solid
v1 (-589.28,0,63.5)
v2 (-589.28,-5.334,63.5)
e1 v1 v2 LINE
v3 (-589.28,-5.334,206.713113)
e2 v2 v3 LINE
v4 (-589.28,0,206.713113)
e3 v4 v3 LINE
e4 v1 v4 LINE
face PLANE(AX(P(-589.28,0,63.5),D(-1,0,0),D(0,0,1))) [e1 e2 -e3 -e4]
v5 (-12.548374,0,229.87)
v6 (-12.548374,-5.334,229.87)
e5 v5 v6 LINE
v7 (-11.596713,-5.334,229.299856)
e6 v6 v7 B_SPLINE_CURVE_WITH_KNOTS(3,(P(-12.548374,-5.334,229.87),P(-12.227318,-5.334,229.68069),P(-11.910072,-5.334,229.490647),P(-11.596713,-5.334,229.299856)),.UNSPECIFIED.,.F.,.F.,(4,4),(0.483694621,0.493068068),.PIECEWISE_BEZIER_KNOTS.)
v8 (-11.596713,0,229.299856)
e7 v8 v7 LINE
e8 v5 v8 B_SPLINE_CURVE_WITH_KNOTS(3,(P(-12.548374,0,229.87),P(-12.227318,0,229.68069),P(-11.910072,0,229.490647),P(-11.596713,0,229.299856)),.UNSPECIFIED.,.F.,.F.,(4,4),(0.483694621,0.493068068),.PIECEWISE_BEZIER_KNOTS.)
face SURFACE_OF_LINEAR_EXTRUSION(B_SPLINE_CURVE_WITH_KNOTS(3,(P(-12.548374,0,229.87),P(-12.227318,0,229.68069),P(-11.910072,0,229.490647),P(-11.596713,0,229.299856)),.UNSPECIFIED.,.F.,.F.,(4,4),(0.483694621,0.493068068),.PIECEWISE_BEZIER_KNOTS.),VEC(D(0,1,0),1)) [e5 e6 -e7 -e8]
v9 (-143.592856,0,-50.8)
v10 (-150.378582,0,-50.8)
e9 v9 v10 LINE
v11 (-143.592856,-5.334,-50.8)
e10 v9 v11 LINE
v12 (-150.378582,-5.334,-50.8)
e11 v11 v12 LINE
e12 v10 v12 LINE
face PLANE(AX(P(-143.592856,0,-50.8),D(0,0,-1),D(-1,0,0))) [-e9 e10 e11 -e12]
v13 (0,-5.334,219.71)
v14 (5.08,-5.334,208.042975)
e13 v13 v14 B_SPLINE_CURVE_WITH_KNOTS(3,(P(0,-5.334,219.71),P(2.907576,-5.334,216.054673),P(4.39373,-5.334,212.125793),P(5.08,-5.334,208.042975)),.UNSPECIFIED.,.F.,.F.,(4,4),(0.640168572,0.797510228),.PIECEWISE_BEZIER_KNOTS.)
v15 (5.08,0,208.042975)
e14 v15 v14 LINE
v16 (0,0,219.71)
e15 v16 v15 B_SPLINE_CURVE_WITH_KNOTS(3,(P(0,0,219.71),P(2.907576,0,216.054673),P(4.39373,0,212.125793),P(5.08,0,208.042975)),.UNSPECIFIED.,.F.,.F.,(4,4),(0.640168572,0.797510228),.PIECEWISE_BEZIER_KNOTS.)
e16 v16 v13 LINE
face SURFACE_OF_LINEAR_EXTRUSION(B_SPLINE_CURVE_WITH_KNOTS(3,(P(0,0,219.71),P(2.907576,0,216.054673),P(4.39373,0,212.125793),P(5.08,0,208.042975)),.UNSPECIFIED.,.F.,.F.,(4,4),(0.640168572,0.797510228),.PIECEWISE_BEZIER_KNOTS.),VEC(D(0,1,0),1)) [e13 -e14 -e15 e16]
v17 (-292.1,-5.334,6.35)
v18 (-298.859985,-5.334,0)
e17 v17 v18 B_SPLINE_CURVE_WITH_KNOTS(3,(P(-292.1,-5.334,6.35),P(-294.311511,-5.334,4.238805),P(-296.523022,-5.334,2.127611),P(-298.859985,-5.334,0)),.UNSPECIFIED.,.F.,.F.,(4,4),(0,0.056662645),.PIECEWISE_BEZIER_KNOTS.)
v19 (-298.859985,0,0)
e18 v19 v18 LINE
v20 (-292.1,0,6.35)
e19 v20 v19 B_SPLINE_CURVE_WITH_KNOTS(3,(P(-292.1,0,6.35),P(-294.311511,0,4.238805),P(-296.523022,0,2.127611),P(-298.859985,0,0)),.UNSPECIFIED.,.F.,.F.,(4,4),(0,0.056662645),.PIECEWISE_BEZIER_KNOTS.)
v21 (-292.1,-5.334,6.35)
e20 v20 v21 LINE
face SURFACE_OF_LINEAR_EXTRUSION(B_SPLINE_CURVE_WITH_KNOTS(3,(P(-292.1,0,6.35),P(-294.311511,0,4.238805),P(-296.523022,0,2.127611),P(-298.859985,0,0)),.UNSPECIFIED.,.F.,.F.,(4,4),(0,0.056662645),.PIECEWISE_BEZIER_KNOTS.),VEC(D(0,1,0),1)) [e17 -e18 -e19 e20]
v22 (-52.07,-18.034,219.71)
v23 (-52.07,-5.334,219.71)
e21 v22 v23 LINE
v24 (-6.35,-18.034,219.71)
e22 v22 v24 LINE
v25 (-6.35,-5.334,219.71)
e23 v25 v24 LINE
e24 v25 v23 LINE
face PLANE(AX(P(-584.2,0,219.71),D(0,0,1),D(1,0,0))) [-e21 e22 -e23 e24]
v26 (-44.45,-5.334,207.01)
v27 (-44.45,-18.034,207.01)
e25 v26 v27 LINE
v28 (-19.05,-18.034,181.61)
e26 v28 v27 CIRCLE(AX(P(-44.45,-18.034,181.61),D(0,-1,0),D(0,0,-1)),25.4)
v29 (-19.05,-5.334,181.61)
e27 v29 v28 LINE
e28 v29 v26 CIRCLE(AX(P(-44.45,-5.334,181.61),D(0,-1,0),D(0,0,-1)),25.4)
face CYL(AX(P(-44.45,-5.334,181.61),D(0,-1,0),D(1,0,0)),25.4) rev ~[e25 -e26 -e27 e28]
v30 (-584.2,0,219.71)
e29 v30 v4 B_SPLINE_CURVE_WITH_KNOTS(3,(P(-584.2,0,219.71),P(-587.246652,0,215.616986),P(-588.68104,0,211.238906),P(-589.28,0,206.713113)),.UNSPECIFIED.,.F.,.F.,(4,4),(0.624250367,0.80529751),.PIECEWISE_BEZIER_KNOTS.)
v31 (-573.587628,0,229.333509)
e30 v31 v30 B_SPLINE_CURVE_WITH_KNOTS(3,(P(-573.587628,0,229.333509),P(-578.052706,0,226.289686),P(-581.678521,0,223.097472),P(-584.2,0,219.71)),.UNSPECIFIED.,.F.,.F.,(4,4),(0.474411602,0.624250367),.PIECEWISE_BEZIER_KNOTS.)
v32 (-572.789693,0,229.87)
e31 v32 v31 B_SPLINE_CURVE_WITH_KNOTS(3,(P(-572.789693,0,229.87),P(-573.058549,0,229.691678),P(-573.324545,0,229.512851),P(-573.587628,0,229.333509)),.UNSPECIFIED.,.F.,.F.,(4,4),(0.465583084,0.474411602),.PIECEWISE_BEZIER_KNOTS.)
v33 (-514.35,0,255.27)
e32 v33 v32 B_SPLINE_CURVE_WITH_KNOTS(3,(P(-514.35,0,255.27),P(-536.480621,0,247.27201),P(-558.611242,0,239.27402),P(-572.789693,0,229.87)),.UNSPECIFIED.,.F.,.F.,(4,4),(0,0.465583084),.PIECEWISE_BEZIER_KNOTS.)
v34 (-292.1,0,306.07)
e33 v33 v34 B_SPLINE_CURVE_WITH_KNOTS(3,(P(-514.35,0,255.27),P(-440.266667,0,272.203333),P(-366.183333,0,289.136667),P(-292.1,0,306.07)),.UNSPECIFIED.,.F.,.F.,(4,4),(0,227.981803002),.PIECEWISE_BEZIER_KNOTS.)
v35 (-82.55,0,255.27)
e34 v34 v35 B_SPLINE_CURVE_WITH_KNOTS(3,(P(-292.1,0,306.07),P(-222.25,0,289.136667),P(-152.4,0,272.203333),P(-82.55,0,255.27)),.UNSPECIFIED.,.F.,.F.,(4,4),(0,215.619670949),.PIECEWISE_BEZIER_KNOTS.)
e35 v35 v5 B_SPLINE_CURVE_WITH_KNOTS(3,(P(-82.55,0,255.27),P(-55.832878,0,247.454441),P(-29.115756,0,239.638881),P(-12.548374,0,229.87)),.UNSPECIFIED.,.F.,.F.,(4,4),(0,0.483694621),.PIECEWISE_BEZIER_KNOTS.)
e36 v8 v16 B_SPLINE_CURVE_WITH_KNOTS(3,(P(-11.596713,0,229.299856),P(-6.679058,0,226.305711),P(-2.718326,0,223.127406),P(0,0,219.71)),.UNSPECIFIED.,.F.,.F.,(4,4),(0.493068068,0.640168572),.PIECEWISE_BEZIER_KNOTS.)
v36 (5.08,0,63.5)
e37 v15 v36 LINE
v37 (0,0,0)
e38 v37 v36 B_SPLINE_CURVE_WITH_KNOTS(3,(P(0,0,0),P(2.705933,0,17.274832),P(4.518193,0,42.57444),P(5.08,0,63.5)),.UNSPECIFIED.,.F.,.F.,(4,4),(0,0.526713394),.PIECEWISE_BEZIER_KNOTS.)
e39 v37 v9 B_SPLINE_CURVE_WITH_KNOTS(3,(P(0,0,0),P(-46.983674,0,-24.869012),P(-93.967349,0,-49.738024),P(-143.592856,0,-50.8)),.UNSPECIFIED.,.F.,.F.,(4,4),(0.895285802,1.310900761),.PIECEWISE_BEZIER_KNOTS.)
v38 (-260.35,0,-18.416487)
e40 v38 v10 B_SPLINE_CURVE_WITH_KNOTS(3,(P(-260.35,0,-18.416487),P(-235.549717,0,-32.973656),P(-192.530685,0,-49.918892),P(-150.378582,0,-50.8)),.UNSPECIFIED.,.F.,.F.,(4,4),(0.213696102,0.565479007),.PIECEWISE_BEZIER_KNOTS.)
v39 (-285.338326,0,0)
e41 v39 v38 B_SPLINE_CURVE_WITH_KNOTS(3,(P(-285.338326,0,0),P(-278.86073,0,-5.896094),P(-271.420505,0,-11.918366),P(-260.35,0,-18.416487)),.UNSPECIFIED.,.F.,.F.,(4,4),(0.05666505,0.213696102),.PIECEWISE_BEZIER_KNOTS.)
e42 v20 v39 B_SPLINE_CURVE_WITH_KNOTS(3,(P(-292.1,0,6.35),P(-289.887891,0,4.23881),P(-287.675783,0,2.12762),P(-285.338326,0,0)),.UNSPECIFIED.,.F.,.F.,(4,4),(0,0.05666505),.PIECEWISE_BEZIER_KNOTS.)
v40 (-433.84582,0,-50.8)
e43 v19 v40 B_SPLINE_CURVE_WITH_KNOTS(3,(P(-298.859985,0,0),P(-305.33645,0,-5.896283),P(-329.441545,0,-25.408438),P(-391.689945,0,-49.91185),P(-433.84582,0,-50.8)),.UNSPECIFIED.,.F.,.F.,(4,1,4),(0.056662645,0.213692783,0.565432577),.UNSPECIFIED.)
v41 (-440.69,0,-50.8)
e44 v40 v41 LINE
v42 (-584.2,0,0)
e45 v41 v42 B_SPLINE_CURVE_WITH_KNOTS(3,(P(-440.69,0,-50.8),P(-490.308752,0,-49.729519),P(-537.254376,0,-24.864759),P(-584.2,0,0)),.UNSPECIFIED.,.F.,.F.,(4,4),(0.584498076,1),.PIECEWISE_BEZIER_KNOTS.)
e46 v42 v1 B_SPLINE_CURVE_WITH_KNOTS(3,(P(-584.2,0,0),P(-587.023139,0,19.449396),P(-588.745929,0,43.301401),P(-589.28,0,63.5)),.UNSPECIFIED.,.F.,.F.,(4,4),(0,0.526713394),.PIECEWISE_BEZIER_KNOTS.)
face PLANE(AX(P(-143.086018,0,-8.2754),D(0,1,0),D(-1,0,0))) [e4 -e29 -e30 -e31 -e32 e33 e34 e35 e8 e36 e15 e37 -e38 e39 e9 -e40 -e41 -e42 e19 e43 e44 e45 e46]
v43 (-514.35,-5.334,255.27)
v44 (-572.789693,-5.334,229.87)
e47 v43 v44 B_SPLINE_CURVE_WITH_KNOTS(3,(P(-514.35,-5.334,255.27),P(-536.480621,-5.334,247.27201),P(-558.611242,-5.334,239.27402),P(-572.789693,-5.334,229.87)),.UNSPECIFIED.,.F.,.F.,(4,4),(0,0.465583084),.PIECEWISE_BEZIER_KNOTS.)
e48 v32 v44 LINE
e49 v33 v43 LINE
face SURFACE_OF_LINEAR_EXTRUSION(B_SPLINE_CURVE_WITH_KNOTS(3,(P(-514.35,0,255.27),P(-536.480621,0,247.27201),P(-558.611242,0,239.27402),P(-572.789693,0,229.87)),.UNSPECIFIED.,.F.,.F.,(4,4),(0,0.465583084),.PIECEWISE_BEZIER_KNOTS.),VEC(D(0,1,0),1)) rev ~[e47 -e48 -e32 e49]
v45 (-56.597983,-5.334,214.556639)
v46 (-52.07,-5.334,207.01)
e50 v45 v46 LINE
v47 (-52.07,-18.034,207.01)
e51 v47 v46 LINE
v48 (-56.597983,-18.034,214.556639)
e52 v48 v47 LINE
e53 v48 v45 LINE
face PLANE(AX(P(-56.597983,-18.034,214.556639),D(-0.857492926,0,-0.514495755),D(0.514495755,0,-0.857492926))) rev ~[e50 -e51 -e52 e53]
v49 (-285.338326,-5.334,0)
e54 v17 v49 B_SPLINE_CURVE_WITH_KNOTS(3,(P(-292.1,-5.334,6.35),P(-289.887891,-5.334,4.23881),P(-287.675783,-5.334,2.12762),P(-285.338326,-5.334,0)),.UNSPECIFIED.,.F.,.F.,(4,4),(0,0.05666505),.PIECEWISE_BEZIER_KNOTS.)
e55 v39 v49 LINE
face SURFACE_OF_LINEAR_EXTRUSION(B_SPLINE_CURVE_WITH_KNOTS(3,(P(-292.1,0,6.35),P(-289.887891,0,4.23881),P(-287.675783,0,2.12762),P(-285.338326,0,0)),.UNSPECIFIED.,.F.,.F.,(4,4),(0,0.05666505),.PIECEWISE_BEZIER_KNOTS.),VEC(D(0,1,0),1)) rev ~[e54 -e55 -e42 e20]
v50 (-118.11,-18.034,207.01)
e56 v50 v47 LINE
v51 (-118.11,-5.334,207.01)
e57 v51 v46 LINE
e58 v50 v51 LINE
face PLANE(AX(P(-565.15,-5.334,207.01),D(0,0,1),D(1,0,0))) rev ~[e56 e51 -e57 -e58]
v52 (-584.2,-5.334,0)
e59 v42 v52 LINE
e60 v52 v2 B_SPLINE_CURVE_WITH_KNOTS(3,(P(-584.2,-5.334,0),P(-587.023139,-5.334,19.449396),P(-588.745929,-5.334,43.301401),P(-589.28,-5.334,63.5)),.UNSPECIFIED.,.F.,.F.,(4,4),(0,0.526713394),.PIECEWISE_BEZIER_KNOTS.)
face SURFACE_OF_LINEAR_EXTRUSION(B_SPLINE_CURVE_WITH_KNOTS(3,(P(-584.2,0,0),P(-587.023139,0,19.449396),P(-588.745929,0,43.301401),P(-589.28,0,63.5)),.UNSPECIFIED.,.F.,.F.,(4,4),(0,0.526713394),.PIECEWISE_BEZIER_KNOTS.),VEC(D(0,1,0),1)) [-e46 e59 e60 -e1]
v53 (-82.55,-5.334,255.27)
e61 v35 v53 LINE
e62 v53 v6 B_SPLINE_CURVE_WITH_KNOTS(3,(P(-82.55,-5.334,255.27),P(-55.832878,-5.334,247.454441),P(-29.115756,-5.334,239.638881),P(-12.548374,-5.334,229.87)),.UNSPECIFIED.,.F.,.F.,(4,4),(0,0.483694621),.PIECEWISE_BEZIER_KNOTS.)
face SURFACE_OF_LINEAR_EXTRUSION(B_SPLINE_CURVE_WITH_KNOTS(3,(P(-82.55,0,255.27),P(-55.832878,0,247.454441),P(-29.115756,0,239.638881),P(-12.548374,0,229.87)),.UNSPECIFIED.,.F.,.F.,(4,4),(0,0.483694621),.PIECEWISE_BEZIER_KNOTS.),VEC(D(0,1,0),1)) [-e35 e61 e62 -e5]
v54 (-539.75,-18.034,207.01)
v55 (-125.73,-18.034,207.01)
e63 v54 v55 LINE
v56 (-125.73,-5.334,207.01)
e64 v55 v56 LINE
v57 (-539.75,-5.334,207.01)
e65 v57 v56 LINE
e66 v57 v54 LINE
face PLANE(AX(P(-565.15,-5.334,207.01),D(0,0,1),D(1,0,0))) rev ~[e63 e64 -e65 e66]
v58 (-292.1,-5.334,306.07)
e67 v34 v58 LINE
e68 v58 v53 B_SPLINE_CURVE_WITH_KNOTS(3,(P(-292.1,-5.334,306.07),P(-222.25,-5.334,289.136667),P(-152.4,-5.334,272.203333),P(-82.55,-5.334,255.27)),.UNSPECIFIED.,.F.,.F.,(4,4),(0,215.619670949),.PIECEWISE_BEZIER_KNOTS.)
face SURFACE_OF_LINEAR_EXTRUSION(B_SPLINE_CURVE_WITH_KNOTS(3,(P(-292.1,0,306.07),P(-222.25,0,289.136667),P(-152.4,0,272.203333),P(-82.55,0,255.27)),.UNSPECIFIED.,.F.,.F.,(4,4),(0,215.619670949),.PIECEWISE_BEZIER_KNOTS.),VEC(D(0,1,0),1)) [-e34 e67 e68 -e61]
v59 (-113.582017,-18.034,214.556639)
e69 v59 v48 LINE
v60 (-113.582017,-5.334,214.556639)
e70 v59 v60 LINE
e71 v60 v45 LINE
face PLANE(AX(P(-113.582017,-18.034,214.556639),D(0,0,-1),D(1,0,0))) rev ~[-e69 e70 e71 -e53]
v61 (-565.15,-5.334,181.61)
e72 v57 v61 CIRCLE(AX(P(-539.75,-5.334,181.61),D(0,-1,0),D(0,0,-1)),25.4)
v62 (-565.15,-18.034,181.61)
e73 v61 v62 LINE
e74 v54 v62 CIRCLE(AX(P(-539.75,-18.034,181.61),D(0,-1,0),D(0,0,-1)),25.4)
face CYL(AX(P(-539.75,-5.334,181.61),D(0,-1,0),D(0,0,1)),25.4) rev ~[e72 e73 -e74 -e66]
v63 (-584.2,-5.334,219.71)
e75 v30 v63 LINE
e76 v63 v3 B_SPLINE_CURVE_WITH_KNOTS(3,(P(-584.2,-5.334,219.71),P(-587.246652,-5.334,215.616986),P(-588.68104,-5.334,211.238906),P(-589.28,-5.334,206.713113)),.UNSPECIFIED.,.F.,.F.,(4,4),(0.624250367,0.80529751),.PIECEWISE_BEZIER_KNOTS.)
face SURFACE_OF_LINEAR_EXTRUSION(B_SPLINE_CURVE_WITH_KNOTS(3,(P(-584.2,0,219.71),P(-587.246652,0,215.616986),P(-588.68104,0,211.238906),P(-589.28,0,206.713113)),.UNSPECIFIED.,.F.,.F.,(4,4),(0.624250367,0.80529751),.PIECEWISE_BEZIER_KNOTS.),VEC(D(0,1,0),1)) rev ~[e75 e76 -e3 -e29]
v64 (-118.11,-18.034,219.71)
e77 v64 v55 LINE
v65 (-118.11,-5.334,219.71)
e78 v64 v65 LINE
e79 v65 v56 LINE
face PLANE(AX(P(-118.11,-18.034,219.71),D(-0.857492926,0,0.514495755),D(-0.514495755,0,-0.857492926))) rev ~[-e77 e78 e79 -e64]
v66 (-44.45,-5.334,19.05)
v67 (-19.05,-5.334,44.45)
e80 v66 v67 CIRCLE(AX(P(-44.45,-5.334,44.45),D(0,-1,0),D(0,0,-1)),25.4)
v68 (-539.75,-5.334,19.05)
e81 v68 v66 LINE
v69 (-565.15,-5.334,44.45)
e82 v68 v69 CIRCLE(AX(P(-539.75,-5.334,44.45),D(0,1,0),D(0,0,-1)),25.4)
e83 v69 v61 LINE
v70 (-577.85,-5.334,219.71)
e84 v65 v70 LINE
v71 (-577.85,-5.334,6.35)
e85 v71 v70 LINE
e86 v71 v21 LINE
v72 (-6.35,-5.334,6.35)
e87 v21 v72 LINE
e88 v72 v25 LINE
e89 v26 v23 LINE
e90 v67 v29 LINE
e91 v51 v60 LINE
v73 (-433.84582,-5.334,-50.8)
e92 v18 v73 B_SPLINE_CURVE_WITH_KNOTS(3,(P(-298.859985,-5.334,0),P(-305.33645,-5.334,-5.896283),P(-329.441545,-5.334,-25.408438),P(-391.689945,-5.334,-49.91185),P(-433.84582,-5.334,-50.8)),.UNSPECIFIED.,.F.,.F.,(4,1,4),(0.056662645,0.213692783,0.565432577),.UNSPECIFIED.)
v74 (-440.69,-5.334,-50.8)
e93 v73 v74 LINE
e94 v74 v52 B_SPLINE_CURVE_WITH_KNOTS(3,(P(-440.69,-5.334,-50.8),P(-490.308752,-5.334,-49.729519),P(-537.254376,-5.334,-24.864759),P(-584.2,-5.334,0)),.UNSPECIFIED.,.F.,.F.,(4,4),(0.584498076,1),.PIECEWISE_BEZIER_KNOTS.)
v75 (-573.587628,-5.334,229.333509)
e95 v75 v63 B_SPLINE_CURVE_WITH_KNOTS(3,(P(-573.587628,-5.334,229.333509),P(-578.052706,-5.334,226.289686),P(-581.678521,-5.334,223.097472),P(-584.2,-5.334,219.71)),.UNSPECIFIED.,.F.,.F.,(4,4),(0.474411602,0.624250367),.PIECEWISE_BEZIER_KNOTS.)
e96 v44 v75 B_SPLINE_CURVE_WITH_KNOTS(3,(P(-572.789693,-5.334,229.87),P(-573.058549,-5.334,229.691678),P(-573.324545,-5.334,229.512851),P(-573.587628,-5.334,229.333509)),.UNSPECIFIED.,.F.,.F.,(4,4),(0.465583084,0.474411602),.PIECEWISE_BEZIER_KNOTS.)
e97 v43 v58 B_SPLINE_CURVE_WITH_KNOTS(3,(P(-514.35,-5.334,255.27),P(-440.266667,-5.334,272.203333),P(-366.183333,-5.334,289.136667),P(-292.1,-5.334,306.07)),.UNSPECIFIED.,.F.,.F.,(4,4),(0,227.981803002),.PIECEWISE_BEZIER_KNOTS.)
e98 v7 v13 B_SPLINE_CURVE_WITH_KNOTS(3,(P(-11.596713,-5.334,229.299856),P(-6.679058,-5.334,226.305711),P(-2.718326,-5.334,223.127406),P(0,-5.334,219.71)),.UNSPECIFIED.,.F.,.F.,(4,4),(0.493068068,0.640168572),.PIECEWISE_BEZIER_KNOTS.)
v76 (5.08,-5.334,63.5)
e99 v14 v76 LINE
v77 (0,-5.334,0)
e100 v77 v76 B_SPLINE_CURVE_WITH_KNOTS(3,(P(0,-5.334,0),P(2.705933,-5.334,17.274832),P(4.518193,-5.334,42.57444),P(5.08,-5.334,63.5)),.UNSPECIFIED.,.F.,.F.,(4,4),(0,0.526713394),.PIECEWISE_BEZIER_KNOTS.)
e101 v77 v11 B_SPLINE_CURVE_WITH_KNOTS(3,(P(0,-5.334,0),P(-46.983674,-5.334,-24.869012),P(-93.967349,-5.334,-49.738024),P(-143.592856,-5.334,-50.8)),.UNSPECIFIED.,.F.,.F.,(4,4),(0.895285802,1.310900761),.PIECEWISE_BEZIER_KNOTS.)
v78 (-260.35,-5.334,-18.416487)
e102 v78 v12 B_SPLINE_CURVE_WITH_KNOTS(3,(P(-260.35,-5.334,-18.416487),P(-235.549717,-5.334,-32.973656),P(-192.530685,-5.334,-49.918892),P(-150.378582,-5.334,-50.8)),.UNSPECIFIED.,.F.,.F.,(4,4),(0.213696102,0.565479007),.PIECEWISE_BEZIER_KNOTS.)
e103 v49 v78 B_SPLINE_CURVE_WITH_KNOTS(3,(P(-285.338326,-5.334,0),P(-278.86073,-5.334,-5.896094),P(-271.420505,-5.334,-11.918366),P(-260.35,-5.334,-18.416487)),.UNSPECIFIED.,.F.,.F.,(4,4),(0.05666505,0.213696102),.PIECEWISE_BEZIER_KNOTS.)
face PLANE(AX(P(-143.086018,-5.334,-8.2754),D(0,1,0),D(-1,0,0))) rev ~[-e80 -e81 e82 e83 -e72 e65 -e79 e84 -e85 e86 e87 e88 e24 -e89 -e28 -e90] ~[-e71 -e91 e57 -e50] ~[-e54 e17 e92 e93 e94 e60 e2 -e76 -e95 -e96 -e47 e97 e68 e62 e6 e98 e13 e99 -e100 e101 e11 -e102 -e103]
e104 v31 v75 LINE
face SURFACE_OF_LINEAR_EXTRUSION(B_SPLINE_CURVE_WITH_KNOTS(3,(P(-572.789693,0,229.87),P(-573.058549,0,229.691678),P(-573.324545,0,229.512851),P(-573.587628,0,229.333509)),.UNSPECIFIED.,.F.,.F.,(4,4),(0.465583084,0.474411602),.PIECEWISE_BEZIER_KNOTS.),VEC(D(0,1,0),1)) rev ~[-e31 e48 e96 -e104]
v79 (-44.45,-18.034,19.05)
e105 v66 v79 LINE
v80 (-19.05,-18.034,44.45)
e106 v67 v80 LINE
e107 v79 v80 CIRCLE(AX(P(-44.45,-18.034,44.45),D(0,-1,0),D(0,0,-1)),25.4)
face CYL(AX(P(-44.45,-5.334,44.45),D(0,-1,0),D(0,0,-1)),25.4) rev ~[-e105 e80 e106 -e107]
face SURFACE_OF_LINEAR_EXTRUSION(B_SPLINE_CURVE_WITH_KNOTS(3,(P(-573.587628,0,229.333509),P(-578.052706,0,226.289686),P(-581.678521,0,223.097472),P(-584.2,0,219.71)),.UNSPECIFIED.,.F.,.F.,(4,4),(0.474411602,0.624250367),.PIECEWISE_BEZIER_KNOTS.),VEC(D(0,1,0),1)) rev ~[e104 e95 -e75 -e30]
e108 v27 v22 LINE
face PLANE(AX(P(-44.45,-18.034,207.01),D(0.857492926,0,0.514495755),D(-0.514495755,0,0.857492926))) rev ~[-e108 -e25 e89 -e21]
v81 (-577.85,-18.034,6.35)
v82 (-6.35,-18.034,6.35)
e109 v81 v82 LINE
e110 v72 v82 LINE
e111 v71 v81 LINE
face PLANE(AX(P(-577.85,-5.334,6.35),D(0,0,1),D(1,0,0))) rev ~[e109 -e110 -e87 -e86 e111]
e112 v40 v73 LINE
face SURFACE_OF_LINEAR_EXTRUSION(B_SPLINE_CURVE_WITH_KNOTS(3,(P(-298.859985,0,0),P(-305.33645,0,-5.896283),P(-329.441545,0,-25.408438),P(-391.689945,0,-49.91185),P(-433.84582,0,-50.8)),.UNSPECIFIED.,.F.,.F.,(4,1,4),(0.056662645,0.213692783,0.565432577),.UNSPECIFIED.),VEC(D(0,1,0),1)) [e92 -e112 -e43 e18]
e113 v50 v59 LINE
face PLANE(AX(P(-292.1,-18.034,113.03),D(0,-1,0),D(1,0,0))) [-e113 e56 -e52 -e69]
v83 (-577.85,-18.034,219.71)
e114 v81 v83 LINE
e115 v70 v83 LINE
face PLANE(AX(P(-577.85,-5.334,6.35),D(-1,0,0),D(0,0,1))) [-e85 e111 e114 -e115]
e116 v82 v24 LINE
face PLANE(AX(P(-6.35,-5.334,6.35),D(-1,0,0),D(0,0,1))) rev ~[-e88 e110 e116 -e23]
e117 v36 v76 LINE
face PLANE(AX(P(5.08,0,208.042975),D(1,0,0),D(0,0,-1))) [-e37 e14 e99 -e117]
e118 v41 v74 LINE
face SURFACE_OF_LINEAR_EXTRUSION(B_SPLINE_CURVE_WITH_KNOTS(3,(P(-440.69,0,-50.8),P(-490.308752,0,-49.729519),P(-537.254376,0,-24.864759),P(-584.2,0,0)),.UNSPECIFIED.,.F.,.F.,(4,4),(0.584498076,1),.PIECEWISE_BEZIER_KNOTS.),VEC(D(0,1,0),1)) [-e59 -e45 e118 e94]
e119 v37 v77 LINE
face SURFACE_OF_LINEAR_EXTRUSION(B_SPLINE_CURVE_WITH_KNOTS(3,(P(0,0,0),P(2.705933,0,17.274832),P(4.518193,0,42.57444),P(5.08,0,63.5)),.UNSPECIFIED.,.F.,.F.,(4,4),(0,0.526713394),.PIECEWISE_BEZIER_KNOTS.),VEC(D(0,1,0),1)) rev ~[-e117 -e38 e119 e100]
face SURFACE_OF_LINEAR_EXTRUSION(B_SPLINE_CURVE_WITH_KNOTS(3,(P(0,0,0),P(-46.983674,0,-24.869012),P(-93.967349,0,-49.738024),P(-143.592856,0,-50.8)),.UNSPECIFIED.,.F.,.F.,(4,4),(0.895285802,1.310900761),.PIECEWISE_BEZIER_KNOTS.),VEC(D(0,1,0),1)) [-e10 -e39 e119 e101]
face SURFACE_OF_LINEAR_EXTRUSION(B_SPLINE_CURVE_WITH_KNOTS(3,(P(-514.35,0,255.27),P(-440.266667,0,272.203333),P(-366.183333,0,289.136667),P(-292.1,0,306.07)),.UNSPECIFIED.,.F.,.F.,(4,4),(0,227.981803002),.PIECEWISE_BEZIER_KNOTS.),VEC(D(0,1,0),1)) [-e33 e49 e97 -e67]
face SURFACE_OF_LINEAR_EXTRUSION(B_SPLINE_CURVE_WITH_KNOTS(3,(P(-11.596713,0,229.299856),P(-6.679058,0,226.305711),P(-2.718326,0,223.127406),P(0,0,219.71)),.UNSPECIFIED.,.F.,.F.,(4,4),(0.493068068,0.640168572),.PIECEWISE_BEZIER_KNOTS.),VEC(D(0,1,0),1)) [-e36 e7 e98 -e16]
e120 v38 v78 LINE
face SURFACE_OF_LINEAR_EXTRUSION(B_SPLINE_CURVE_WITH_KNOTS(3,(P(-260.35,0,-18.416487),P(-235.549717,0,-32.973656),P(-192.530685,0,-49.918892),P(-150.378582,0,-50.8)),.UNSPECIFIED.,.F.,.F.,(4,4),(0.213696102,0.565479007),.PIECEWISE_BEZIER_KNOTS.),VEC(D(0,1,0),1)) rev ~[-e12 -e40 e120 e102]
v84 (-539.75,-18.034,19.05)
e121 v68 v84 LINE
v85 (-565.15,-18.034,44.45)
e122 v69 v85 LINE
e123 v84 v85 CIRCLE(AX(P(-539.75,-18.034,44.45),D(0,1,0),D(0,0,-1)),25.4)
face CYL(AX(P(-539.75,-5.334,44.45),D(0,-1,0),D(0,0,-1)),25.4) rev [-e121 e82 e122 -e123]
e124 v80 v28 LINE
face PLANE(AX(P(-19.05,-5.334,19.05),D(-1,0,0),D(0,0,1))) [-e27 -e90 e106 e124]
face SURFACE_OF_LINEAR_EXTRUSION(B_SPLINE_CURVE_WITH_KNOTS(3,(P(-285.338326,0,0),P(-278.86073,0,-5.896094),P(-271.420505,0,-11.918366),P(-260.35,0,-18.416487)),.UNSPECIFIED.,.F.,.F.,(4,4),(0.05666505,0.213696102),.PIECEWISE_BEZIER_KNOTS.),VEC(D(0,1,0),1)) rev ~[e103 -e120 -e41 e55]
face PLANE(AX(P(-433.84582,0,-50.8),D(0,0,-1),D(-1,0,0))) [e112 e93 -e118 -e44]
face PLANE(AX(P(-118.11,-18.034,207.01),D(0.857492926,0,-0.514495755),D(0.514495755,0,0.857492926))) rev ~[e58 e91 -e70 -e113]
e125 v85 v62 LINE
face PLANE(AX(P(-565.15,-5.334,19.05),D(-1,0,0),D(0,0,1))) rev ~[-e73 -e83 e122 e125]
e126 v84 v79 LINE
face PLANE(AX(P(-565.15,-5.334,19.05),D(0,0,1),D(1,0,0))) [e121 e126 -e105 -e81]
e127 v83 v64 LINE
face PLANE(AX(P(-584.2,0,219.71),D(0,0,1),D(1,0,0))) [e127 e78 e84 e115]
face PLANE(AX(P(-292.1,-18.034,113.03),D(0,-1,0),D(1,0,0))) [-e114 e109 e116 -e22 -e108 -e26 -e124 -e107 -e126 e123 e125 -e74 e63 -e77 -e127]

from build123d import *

# Parameters (mm, degrees)
F0_W     = 584.2
F0_H     = 219.71
F1_DEPTH = 5.334
F2_W     = 571.5
F2_H     = 213.36
F2_W_2   = 546.1
F2_H_2   = 187.96
F3_DEPTH = 12.7
F4_R     = 25.4
F6_DEPTH = 12.7
F8_DEPTH = 5.334
F9_DEPTH = 5.334


# Not quite as in the source:
# - a feature names something its author has since deleted; it is built from what else it names


with BuildPart() as f1:
    # F0 (on Front) → F1 (new body)
    with BuildSketch(Plane.XZ):
        with Locations((-292.1, 109.855)):
            Rectangle(F0_W, F0_H)
    extrude(amount=F1_DEPTH)

    # F2 (on face) → F3 (join)
    with BuildSketch(Plane.XZ.offset(5.334)):
        with Locations((-292.1, 113.03)):
            Rectangle(F2_W, F2_H)
        with Locations((-292.1, 113.03)):
            Rectangle(F2_W_2, F2_H_2, mode=Mode.SUBTRACT)
    extrude(amount=F3_DEPTH)

    # F4
    f4_edges = [f1.edges().sort_by_distance(p)[0] for p in [
        (-565.15, -11.684, 207.01),
        (-19.05, -11.684, 207.01),
        (-19.05, -11.684, 19.05),
        (-565.15, -11.684, 19.05),
    ]]
    fillet(f4_edges, radius=F4_R)

    # F5 (on face) → F6 (cut)
    with BuildSketch(Plane.XZ.offset(18.034)):
        Polygon((-118.11, 219.71), (-125.73, 207.01), (-118.11, 207.01), (-113.5820166854, 214.5566388576), (-110.49, 219.71), align=None)
        Polygon((-56.5979833146, 214.5566388576), (-52.07, 207.01), (-44.45, 207.01), (-52.07, 219.71), (-59.69, 219.71), align=None)
        Polygon((-59.69, 219.71), (-110.49, 219.71), (-113.5820166854, 214.5566388576), (-56.5979833146, 214.5566388576), align=None)
    extrude(amount=-F6_DEPTH, mode=Mode.SUBTRACT)

    # F7 (on face) → F8 (cut)
    with BuildSketch(Plane(origin=(0, 0, 0), x_dir=(-1, 0, 0), z_dir=(0, 1, 0))):
        with BuildLine():
            add(Edge.make_bspline(
                [(292.1, 6.35), (289.8878914708, 4.2388101088), (287.6757829415, 2.1276202176), (285.3383261504, 0)],
                knots=[0, 0, 0, 0, 0.0566650496, 0.0566650496, 0.0566650496, 0.0566650496], degree=3))
            Line((285.3383261504, 0), (292.1, 0))
            Line((292.1, 0), (292.1, 6.35))
        make_face()
        with BuildLine():
            add(Edge.make_bspline(
                [(292.1, 6.35), (294.3115112442, 4.2388053382), (296.5230224884, 2.1276106765), (298.8599853109, 0)],
                knots=[0, 0, 0, 0, 0.056662645, 0.056662645, 0.056662645, 0.056662645], degree=3))
            Line((292.1, 6.35), (292.1, 0))
            Line((292.1, 0), (298.8599853109, 0))
        make_face()
    extrude(amount=-F8_DEPTH, mode=Mode.SUBTRACT)

    # F7 (on face) → F9 (join)
    with BuildSketch(Plane(origin=(0, 0, 0), x_dir=(-1, 0, 0), z_dir=(0, 1, 0))):
        with BuildLine():
            Line((285.3383261504, 0), (0, 0))
            add(Edge.make_bspline(
                [(35.5548654074, -18.4164866805), (23.6750755263, -12.5314961521), (11.8375377632, -6.265748076), (0, 0)],
                knots=[0.8952858021, 0.8952858021, 0.8952858021, 0.8952858021, 1, 1, 1, 1], degree=3))
            Line((35.5548654074, -18.4164866805), (260.35, -18.4164866805))
            add(Edge.make_bspline(
                [(285.3383261504, 0), (278.8607301271, -5.8960937002), (271.4205053001, -11.9183662972), (260.35, -18.4164866805)],
                knots=[0.0566650496, 0.0566650496, 0.0566650496, 0.0566650496, 0.2136961022, 0.2136961022, 0.2136961022, 0.2136961022], degree=3))
        make_face()
        with BuildLine():
            add(Edge.make_bspline(
                [(0, 0), (-2.7059325948, 17.274832353), (-4.5181928473, 42.574440276), (-5.08, 63.5)],
                knots=[0, 0, 0, 0, 0.5267133936, 0.5267133936, 0.5267133936, 0.5267133936], degree=3))
            Line((0, 0), (0, 219.71))
            add(Edge.make_bspline(
                [(0, 219.71), (-2.907575848, 216.0546733014), (-4.393729889, 212.1257933571), (-5.08, 208.0429754021)],
                knots=[0.6401685719, 0.6401685719, 0.6401685719, 0.6401685719, 0.7975102285, 0.7975102285, 0.7975102285, 0.7975102285], degree=3))
            Line((-5.08, 208.0429754021), (-5.08, 191.77))
            Line((-5.08, 191.77), (-5.08, 114.935))
            Line((-5.08, 114.935), (-5.08, 63.5))
        make_face()
        with BuildLine():
            Line((260.35, -18.4164866805), (35.5548654074, -18.4164866805))
            add(Edge.make_bspline(
                [(143.5928555626, -50.8), (106.470496214, -50.0055886792), (70.8264502644, -35.8892656507), (35.5548654074, -18.4164866805)],
                knots=[0.5843850409, 0.5843850409, 0.5843850409, 0.5843850409, 0.8952858021, 0.8952858021, 0.8952858021, 0.8952858021], degree=3))
            Line((143.5928555626, -50.8), (150.3785817486, -50.8))
            add(Edge.make_bspline(
                [(260.35, -18.4164866805), (235.5497171967, -32.973656279), (192.5306851802, -49.9188924594), (150.3785817486, -50.8)],
                knots=[0.2136961022, 0.2136961022, 0.2136961022, 0.2136961022, 0.5654790071, 0.5654790071, 0.5654790071, 0.5654790071], degree=3))
        make_face()
        with BuildLine():
            add(Edge.make_bspline(
                [(11.5967126237, 229.2998559787), (6.6790583406, 226.3057112292), (2.7183257178, 223.1274064895), (0, 219.71)],
                knots=[0.4930680682, 0.4930680682, 0.4930680682, 0.4930680682, 0.6401685719, 0.6401685719, 0.6401685719, 0.6401685719], degree=3))
            Line((0, 219.71), (292.1, 219.71))
            Line((292.1, 219.71), (11.5967126237, 229.2998559787))
        make_face()
        with BuildLine():
            add(Edge.make_bspline(
                [(12.5483744012, 229.87), (12.2273175537, 229.6806902818), (11.9100723395, 229.4906470132), (11.5967126237, 229.2998559787)],
                knots=[0.4836946212, 0.4836946212, 0.4836946212, 0.4836946212, 0.4930680682, 0.4930680682, 0.4930680682, 0.4930680682], degree=3))
            Line((11.5967126237, 229.2998559787), (292.1, 219.71))
            Line((292.1, 219.71), (573.5876283802, 229.3335086626))
            add(Edge.make_bspline(
                [(572.7896932404, 229.87), (573.0585490403, 229.6916783135), (573.3245454934, 229.5128510633), (573.5876283802, 229.3335086626)],
                knots=[0.4655830842, 0.4655830842, 0.4655830842, 0.4655830842, 0.4744116019, 0.4744116019, 0.4744116019, 0.4744116019], degree=3))
            Line((572.7896932404, 229.87), (514.35, 229.87))
            Line((514.35, 229.87), (292.1, 229.87))
            Line((292.1, 229.87), (82.55, 229.87))
            Line((82.55, 229.87), (12.5483744012, 229.87))
        make_face()
        with BuildLine():
            Line((573.5876283802, 229.3335086626), (292.1, 219.71))
            Line((292.1, 219.71), (584.2, 219.71))
            add(Edge.make_bspline(
                [(573.5876283802, 229.3335086626), (578.0527057549, 226.2896858373), (581.6785208511, 223.0974722581), (584.2, 219.71)],
                knots=[0.4744116019, 0.4744116019, 0.4744116019, 0.4744116019, 0.6242503674, 0.6242503674, 0.6242503674, 0.6242503674], degree=3))
        make_face()
        with BuildLine():
            add(Edge.make_bspline(
                [(298.8599853109, 0), (305.3364495341, -5.8962831133), (312.7764065366, -11.9186444461), (323.85, -18.4164866805)],
                knots=[0.056662645, 0.056662645, 0.056662645, 0.056662645, 0.2136927825, 0.2136927825, 0.2136927825, 0.2136927825], degree=3))
            Line((323.85, -18.4164866805), (548.6673215949, -18.4164866805))
            add(Edge.make_bspline(
                [(548.6673215949, -18.4164866805), (560.540064076, -12.5314899408), (572.370032038, -6.2657449704), (584.2, 0)],
                knots=[0.8952964295, 0.8952964295, 0.8952964295, 0.8952964295, 1, 1, 1, 1], degree=3))
            Line((584.2, 0), (298.8599853109, 0))
        make_face()
        with BuildLine():
            Line((548.6673215949, -18.4164866805), (323.85, -18.4164866805))
            add(Edge.make_bspline(
                [(323.85, -18.4164866805), (348.6543054028, -32.9713340996), (391.6899454814, -49.9118498543), (433.8458201185, -50.8)],
                knots=[0.2136927825, 0.2136927825, 0.2136927825, 0.2136927825, 0.5654325768, 0.5654325768, 0.5654325768, 0.5654325768], degree=3))
            Line((433.8458201185, -50.8), (440.69, -50.8))
            add(Edge.make_bspline(
                [(440.69, -50.8), (477.8051745876, -49.9992725657), (513.4246952416, -35.8853016167), (548.6673215949, -18.4164866805)],
                knots=[0.5844980763, 0.5844980763, 0.5844980763, 0.5844980763, 0.8952964295, 0.8952964295, 0.8952964295, 0.8952964295], degree=3))
        make_face()
        with BuildLine():
            add(Edge.make_bspline(
                [(82.55, 255.27), (55.8328777889, 247.4544406939), (29.1157555777, 239.6388813877), (12.5483744012, 229.87)],
                knots=[0, 0, 0, 0, 0.4836946212, 0.4836946212, 0.4836946212, 0.4836946212], degree=3))
            Line((12.5483744012, 229.87), (82.55, 229.87))
            Line((82.55, 229.87), (82.55, 255.27))
        make_face()
        with BuildLine():
            add(Edge.make_bspline(
                [(584.2, 219.71), (587.2466521414, 215.6169859397), (588.681040168, 211.2389059428), (589.28, 206.7131131)],
                knots=[0.6242503674, 0.6242503674, 0.6242503674, 0.6242503674, 0.8052975103, 0.8052975103, 0.8052975103, 0.8052975103], degree=3))
            Line((584.2, 219.71), (584.2, 0))
            add(Edge.make_bspline(
                [(584.2, 0), (587.0231389999, 19.4493960589), (588.7459289581, 43.301401327), (589.28, 63.5)],
                knots=[0, 0, 0, 0, 0.5267133936, 0.5267133936, 0.5267133936, 0.5267133936], degree=3))
            Line((589.28, 63.5), (589.28, 114.935))
            Line((589.28, 114.935), (589.28, 191.77))
            Line((589.28, 191.77), (589.28, 206.7131131))
        make_face()
        with BuildLine():
            Line((82.55, 255.27), (82.55, 229.87))
            Line((82.55, 229.87), (292.1, 229.87))
            Line((292.1, 229.87), (292.1, 306.07))
            add(Edge.make_bspline(
                [(292.1, 306.07), (222.25, 289.1366666667), (152.4, 272.2033333333), (82.55, 255.27)],
                knots=[0, 0, 0, 0, 215.6196709486, 215.6196709486, 215.6196709486, 215.6196709486], degree=3))
        make_face()
        with BuildLine():
            Line((514.35, 229.87), (572.7896932404, 229.87))
            add(Edge.make_bspline(
                [(514.35, 255.27), (536.4806207919, 247.2720101715), (558.6112415838, 239.274020343), (572.7896932404, 229.87)],
                knots=[0, 0, 0, 0, 0.4655830842, 0.4655830842, 0.4655830842, 0.4655830842], degree=3))
            Line((514.35, 255.27), (514.35, 229.87))
        make_face()
        with BuildLine():
            Line((292.1, 306.07), (292.1, 229.87))
            Line((292.1, 229.87), (514.35, 229.87))
            Line((514.35, 229.87), (514.35, 255.27))
            add(Edge.make_bspline(
                [(514.35, 255.27), (440.2666666667, 272.2033333333), (366.1833333333, 289.1366666667), (292.1, 306.07)],
                knots=[0, 0, 0, 0, 227.9818030019, 227.9818030019, 227.9818030019, 227.9818030019], degree=3))
        make_face()
    extrude(amount=-F9_DEPTH)


solid = f1.part
